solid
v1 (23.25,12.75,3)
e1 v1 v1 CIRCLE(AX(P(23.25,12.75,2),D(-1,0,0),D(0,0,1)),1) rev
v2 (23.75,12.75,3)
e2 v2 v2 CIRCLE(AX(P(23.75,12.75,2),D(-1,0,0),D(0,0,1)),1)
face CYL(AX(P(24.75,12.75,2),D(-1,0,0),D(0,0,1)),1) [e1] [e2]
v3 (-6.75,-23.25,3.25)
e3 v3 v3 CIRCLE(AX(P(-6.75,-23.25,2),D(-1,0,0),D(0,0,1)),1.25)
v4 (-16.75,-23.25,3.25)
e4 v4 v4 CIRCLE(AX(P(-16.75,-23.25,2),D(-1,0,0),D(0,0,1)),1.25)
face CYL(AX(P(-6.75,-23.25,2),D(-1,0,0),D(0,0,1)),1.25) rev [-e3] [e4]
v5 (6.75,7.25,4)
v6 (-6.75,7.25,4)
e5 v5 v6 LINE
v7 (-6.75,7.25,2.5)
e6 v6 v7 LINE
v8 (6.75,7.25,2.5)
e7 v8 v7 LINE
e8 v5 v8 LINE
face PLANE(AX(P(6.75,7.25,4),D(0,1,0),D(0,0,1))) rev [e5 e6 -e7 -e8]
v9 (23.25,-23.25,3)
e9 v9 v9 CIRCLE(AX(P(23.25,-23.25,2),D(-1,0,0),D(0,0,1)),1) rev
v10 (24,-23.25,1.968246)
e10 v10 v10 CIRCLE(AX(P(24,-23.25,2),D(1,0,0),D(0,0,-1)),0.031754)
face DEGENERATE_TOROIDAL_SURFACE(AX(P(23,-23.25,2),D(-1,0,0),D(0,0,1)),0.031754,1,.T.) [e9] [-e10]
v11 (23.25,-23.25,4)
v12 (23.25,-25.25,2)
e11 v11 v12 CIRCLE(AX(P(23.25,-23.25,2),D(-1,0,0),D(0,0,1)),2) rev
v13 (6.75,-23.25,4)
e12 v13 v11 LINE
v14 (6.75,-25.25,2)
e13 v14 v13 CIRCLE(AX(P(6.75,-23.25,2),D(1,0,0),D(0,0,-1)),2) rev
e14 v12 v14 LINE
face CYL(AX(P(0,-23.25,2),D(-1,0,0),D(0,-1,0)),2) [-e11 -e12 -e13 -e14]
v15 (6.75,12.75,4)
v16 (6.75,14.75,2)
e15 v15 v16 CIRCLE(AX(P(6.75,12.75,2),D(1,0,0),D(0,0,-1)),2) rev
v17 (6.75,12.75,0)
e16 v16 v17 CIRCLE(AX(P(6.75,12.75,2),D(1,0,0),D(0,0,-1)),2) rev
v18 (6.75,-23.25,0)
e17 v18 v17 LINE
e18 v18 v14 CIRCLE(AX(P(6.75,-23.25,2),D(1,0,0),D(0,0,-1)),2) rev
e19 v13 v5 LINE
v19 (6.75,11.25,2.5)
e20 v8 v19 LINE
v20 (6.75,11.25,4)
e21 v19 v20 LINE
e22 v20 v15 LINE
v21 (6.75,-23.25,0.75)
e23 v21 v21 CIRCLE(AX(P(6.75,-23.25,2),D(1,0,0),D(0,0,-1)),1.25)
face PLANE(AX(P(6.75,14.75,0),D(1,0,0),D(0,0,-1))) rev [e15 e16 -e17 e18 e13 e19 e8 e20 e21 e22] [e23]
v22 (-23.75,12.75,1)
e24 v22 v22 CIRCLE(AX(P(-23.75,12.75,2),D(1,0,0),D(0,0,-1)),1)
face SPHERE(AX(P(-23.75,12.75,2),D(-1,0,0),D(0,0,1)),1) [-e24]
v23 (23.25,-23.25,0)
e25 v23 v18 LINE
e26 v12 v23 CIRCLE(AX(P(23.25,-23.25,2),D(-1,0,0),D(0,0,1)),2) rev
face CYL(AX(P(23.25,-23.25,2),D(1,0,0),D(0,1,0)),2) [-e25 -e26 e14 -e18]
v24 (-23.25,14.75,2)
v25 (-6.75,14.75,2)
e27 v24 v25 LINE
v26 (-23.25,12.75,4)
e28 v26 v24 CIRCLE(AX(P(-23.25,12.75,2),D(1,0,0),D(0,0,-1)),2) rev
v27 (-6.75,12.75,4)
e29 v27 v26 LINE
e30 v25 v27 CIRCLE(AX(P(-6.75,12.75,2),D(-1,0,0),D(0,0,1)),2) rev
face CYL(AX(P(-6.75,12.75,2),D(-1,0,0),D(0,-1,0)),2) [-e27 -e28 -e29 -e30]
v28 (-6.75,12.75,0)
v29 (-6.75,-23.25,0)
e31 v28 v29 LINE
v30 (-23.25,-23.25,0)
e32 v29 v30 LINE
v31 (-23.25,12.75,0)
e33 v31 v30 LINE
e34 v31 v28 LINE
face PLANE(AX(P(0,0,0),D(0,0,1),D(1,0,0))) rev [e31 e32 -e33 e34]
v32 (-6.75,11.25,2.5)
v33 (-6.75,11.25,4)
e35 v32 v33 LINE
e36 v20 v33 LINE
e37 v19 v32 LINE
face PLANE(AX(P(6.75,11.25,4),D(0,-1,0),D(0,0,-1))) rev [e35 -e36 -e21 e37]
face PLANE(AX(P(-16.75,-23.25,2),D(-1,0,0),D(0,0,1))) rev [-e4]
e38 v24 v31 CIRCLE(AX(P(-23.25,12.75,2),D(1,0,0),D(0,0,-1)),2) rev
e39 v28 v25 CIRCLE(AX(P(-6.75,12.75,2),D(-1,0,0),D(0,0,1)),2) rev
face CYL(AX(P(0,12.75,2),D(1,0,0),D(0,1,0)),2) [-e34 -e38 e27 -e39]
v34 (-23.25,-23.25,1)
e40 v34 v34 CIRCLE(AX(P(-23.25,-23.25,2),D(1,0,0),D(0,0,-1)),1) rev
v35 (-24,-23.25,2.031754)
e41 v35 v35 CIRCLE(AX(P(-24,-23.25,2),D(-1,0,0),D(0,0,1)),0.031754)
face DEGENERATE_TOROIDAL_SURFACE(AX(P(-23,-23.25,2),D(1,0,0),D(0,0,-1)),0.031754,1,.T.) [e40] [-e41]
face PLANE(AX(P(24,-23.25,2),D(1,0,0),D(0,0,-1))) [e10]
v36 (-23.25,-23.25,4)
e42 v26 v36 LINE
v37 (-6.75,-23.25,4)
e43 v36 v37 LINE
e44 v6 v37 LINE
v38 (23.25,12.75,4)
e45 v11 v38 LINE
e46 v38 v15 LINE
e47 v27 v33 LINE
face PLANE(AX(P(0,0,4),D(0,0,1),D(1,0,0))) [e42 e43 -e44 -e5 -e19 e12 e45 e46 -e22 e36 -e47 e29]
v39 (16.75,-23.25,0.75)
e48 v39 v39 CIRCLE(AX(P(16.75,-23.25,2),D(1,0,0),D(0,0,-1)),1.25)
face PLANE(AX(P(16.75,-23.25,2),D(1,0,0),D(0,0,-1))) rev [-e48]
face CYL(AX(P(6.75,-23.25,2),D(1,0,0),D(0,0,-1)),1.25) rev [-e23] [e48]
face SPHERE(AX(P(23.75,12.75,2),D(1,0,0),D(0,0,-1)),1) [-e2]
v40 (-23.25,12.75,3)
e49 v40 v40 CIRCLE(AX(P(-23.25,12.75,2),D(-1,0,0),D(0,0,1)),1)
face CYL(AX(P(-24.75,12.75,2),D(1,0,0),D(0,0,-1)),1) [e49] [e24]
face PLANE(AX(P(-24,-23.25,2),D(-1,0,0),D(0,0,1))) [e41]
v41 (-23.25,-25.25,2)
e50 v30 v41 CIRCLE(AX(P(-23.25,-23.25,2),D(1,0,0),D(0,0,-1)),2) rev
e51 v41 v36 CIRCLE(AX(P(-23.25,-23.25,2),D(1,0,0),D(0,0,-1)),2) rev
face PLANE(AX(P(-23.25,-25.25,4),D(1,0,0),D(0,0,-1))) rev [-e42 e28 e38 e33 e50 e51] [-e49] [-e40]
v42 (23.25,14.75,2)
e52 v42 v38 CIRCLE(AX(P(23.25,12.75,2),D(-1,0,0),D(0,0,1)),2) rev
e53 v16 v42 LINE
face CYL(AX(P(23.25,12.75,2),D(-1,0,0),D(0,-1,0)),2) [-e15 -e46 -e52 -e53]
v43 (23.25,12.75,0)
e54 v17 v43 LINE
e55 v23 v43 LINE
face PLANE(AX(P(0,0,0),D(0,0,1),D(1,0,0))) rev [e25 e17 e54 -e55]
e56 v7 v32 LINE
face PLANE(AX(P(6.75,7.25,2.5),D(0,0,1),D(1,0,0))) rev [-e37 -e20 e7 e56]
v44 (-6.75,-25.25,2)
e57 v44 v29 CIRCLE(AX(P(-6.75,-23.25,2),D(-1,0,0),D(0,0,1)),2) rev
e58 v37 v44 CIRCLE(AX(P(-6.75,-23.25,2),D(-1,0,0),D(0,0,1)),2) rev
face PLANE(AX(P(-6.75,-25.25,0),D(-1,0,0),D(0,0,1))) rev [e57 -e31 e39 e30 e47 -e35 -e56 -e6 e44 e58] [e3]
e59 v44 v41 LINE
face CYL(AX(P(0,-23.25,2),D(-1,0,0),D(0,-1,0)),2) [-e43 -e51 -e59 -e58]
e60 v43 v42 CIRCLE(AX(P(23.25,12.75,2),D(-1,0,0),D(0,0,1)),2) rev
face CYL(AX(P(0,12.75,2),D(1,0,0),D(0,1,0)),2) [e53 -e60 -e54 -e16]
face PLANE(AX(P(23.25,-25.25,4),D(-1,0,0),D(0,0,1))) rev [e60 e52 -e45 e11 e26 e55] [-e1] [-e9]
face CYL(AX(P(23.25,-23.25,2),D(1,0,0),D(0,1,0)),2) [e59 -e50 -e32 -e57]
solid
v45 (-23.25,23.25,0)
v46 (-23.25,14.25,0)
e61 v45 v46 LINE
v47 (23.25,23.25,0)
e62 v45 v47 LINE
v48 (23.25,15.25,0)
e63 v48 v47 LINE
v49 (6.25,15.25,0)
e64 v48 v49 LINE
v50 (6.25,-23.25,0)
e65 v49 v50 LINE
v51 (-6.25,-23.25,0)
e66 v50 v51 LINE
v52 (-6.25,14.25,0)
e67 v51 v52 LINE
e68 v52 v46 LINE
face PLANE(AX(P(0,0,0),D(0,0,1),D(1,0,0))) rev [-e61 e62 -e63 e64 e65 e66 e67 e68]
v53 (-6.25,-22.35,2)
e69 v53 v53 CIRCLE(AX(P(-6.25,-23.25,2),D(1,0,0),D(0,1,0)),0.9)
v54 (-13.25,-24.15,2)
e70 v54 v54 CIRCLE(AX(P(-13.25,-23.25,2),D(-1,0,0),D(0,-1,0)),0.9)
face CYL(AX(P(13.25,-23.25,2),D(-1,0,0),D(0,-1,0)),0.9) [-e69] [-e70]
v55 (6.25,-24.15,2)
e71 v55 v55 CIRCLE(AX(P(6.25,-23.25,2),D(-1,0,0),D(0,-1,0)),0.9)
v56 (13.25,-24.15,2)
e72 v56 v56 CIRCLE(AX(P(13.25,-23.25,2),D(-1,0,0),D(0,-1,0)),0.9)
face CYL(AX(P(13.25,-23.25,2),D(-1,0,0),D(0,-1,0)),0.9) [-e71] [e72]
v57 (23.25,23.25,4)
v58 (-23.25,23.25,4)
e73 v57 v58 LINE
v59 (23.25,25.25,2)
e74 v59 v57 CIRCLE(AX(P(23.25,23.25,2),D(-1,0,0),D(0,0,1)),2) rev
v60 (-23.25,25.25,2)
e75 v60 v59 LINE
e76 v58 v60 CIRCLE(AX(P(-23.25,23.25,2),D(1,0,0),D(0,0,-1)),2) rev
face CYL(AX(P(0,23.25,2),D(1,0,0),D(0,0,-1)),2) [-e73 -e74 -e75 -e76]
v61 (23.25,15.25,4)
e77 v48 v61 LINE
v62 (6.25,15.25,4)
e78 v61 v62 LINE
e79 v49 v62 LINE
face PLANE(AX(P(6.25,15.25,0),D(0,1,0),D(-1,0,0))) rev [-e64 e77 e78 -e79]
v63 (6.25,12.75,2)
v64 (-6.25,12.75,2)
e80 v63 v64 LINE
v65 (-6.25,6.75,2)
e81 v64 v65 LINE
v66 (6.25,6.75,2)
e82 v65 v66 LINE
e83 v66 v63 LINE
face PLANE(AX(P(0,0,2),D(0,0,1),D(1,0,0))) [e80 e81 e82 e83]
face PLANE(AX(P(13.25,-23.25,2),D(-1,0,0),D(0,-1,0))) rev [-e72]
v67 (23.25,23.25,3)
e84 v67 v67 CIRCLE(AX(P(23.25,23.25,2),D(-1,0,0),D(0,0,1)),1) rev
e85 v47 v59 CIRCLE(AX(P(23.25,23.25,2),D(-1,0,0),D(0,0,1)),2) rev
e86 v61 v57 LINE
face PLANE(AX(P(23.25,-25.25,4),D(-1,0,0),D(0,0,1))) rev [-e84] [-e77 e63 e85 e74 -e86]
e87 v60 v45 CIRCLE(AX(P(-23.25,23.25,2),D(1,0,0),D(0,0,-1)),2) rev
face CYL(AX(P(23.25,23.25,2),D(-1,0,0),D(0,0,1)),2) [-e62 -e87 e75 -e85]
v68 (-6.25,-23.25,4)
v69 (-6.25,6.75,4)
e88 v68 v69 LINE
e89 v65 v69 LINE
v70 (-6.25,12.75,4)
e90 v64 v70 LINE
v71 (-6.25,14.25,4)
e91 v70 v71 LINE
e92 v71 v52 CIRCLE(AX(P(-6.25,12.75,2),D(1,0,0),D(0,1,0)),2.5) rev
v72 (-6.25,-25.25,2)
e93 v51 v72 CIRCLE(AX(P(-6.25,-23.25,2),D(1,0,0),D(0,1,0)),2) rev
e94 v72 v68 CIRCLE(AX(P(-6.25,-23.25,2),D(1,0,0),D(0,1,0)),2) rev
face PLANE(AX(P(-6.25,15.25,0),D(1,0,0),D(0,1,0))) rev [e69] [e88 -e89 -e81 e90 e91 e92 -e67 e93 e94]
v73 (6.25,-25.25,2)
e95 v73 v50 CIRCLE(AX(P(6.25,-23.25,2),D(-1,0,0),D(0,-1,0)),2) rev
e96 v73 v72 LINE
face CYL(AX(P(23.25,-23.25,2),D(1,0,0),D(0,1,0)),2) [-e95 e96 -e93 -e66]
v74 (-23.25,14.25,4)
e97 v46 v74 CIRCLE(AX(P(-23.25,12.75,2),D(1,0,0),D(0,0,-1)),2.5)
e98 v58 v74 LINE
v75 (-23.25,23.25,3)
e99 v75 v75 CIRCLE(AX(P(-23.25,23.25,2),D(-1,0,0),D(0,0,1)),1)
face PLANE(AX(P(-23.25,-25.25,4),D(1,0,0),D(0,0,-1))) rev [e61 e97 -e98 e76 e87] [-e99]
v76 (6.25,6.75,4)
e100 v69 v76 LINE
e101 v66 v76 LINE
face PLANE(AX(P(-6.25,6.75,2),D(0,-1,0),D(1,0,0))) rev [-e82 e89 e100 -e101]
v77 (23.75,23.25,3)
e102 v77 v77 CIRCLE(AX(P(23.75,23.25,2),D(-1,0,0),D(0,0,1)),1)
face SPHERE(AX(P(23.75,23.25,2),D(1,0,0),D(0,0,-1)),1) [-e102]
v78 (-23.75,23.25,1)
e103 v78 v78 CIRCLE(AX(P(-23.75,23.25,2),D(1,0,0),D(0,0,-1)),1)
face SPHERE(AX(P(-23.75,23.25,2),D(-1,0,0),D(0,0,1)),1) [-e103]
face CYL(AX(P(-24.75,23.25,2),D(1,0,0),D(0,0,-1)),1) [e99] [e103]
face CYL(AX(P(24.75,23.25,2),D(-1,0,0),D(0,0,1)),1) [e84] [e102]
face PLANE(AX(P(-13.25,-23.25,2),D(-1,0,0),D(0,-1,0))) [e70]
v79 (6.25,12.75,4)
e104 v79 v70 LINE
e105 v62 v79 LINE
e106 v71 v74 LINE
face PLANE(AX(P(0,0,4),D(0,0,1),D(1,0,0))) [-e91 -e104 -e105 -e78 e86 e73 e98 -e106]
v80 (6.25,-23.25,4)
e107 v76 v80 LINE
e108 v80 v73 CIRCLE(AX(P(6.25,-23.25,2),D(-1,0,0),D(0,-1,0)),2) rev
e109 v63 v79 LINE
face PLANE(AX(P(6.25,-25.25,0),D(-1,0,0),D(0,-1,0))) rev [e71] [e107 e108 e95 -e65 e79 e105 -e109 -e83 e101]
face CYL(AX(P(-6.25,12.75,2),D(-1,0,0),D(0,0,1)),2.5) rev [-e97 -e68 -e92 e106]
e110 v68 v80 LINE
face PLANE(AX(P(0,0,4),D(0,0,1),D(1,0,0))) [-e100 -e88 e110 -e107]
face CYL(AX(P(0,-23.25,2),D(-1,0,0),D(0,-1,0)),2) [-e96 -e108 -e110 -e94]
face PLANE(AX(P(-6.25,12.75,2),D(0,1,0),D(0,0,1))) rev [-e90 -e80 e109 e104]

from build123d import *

# Parameters (mm, degrees)
SKETCH1_W             = 46.5
SKETCH1_H             = 50.5
BODY_DEPTH            = 4
BODY_CUT_DEPTH        = 4
FILLET1_R             = 2
FILLET2_R             = 2
FILLET3_R             = 2
HINGE_HOLE_L_START    = -6.5
SKETCH4_R             = 1.25
HINGE_HOLE_L_DEPTH    = 10
HINGE_HOLE_R_START    = -6.5
SKETCH8_R             = 1.25
HINGE_HOLE_R_DEPTH    = 10
HINGE_ROD_START       = 7
SKETCH7_R             = 0.9
HINGE_ROD_DEPTH       = 26.5
SKETCH9_W             = 12.5
SKETCH9_H             = 6
CONN_CUT_DEPTH        = 2
SKETCH10_W            = 1.5
SKETCH10_H            = 4
CONN_PIECE_DEPTH      = 13.5
SKETCH12_R            = 1
BUMPS_L_DEPTH         = 1.5
SKETCH13_R            = 1
BUMPS_R_DEPTH         = 1.5
SKETCH14_R            = 1
MINI_BUMP_L_DEPTH     = 0.75
SKETCH15_R            = 1
MINI_BUMP_R_DEPTH     = 0.75
FILLET6_R             = 1
FILLET7_R             = 1
FILLET8_R             = 1
HOOK_MATERIAL_R_DEPTH = 17


# Some blends are built 0.0001 mm under size
with BuildPart() as part:
    # Sketch1 → body (new body)
    with BuildSketch(Plane.XY):
        Rectangle(SKETCH1_W, SKETCH1_H)
    extrude(amount=BODY_DEPTH)

    # Sketch2 → body_cut (cut)
    with BuildSketch(Plane.XY.offset(4)):
        Polygon((-23.25, 15.25), (-6.25, 15.25), (-6.25, -25.25), (-6.75, -25.25), (-6.75, 14.75), (-23.25, 14.75), align=None)
        Polygon((6.25, 15.25), (23.25, 15.25), (23.25, 14.75), (6.75, 14.75), (6.75, -25.25), (6.25, -25.25), align=None)
    extrude(amount=-BODY_CUT_DEPTH, mode=Mode.SUBTRACT)


with BuildPart() as body_cut_piece_1:
    # of the separate pieces the step leaves, piece 1, a body of its own (body_cut_pieces)
    add(part.part.solids().sort_by_distance((6.25, -25.25, 0))[0])

    # Fillet3
    fillet3_edges = [body_cut_piece_1.edges().sort_by_distance(p)[0] for p in [
        (0, 25.25, 0),
        (0, 25.25, 4),
        (0, -25.25, 0),
        (0, -25.25, 4),
    ]]
    fillet(fillet3_edges, radius=FILLET3_R - 0.0001)  # a hair under: the kernel refuses the full size

    # Sketch7 → hinge_rod (add)
    with BuildSketch(Plane.ZY.offset(6.25).offset(HINGE_ROD_START)):
        with Locations(Location((2, -23.25, 0), (0, 0, 270))):
            Circle(SKETCH7_R)
    extrude(amount=-HINGE_ROD_DEPTH)

    # Sketch9 → conn_cut (cut)
    with BuildSketch(Plane.XY.offset(4)):
        with Locations((0, 9.75)):
            Rectangle(SKETCH9_W, SKETCH9_H)
    extrude(amount=-CONN_CUT_DEPTH, mode=Mode.SUBTRACT)



with BuildPart() as body_cut_piece_2:
    # of the separate pieces the step leaves, piece 2, a body of its own (body_cut_pieces)
    add(part.part.solids().sort_by_distance((-6.75, -25.25, 0))[0])

    # Fillet1
    fillet1_edges = [body_cut_piece_2.edges().sort_by_distance(p)[0] for p in [
        (-15, -25.25, 0),
        (-15, -25.25, 4),
        (-15, 14.75, 4),
        (-15, 14.75, 0),
    ]]
    fillet(fillet1_edges, radius=FILLET1_R - 0.0001)  # a hair under: the kernel refuses the full size

    # Sketch8 → hinge_hole_r (cut)
    with BuildSketch(Plane.ZY.offset(23.25).offset(HINGE_HOLE_R_START)):
        with Locations(Location((2, -23.25, 0), (0, 0, 180))):
            Circle(SKETCH8_R)
    extrude(amount=-HINGE_HOLE_R_DEPTH, mode=Mode.SUBTRACT)



with BuildPart() as body_cut_piece_3:
    # of the separate pieces the step leaves, piece 3, a body of its own (body_cut_pieces)
    add(part.part.solids().sort_by_distance((23.25, -25.25, 0))[0])

    # Fillet2
    fillet2_edges = [body_cut_piece_3.edges().sort_by_distance(p)[0] for p in [
        (15, 14.75, 0),
        (15, -25.25, 0),
        (15, -25.25, 4),
        (15, 14.75, 4),
    ]]
    fillet(fillet2_edges, radius=FILLET2_R - 0.0001)  # a hair under: the kernel refuses the full size

    # Sketch4 → hinge_hole_l (cut)
    with BuildSketch(Plane(origin=(23.25, 0, 0), x_dir=(0, 0, -1), z_dir=(1, 0, 0)).offset(HINGE_HOLE_L_START)):
        with Locations((-2, -23.25)):
            Circle(SKETCH4_R)
    extrude(amount=-HINGE_HOLE_L_DEPTH, mode=Mode.SUBTRACT)


with BuildPart() as body_cut_piece_2_1:
    add(body_cut_piece_2.part)

    add(body_cut_piece_3.part)  # conn_piece merges body_cut piece 3
    # Sketch10 → conn_piece (add)
    with BuildSketch(Plane(origin=(-6.75, 0, 0), x_dir=(0, 0, -1), z_dir=(1, 0, 0))):
        with Locations((-3.25, 9.25)):
            Rectangle(SKETCH10_W, SKETCH10_H)
    extrude(amount=CONN_PIECE_DEPTH)


with BuildPart() as body_cut_piece_1_1:
    add(body_cut_piece_1.part)

    add(body_cut_piece_2_1.part)  # bumps_l merges body_cut piece 2
    # Sketch12 → bumps_l (add)
    with BuildSketch(Plane(origin=(23.25, 0, 0), x_dir=(0, 0, -1), z_dir=(1, 0, 0))):
        with Locations(Location((-2, 23.25, 0), (0, 0, 180))):
            Circle(SKETCH12_R)
        with Locations(Location((-2, 12.75, 0), (0, 0, 180))):
            Circle(SKETCH12_R)
    extrude(amount=BUMPS_L_DEPTH)

    # Sketch13 → bumps_r (add)
    with BuildSketch(Plane.ZY.offset(23.25)):
        with Locations((2, 23.25)):
            Circle(SKETCH13_R)
        with Locations((2, 12.75)):
            Circle(SKETCH13_R)
    extrude(amount=BUMPS_R_DEPTH)

    # Sketch14 → mini_bump_l (add)
    with BuildSketch(Plane(origin=(23.25, 0, 0), x_dir=(0, 0, -1), z_dir=(1, 0, 0))):
        with Locations(Location((-2, -23.25, 0), (0, 0, 180))):
            Circle(SKETCH14_R)
    extrude(amount=MINI_BUMP_L_DEPTH)

    # Sketch15 → mini_bump_r (add)
    with BuildSketch(Plane.ZY.offset(23.25)):
        with Locations((2, -23.25)):
            Circle(SKETCH15_R)
    extrude(amount=MINI_BUMP_R_DEPTH)

    # Fillet6
    fillet6_edges = [body_cut_piece_1_1.edges().sort_by_distance(p)[0] for p in [
        (24.75, 23.25, 1),
        (-24.75, 23.25, 1),
    ]]
    fillet(fillet6_edges, radius=FILLET6_R)

    # Fillet7
    # the kernel refuses this fillet: 1 mm, written as the material it takes off along each edge
    with BuildSketch(Plane(origin=(-24.75, 12.75, 2), x_dir=(0, 0, 1), z_dir=(0, -1, 0))) as fillet7_piece_1:
        with BuildLine():
            CenterArc((1 - FILLET7_R, -FILLET7_R), FILLET7_R, 0, 90)
            Line((1 - FILLET7_R, 0), (1 - FILLET7_R, FILLET7_R * 0.02))
            Line((1 - FILLET7_R, FILLET7_R * 0.02), (1, FILLET7_R * 0.02))
            Line((1, FILLET7_R * 0.02), (1 + FILLET7_R * 0.02, 0))
            Line((1 + FILLET7_R * 0.02, 0), (1 + FILLET7_R * 0.02, -FILLET7_R))
            Line((1 + FILLET7_R * 0.02, -FILLET7_R), (1, -FILLET7_R))
        make_face()
    revolve(axis=Axis((-24.75, 12.75, 2), (-1, 0, 0)), mode=Mode.SUBTRACT)
    with BuildSketch(Plane(origin=(-24, -23.25, 2), x_dir=(0, 0, 1), z_dir=(0, -1, 0))) as fillet7_piece_2:
        with BuildLine():
            CenterArc((0.031754163, -1), FILLET7_R, 14.477512186, 75.522487814)
            Line((0.031754163, 0), (0.031754163, 0.02))
            Line((0.031754163, 0.02), (1, 0.02))
            Line((1, 0.02), (1.02, 0))
            ThreePointArc((1.02, 0), (1.02, -0.375), (1.019364917, -0.745))
            Line((1.019364917, -0.745), (1, -0.75))
        make_face()
    revolve(axis=Axis((-24, -23.25, 2), (-1, 0, 0)), mode=Mode.SUBTRACT)

    # Fillet8
    # the kernel refuses this fillet: 1 mm, written as the material it takes off along each edge
    with BuildSketch(Plane(origin=(24.75, 12.75, 2), x_dir=(0, 0, 1), z_dir=(0, 1, 0))) as fillet8_piece_1:
        with BuildLine():
            CenterArc((1 - FILLET8_R, -FILLET8_R), FILLET8_R, 0, 90)
            Line((1 - FILLET8_R, 0), (1 - FILLET8_R, FILLET8_R * 0.02))
            Line((1 - FILLET8_R, FILLET8_R * 0.02), (1, FILLET8_R * 0.02))
            Line((1, FILLET8_R * 0.02), (1 + FILLET8_R * 0.02, 0))
            Line((1 + FILLET8_R * 0.02, 0), (1 + FILLET8_R * 0.02, -FILLET8_R))
            Line((1 + FILLET8_R * 0.02, -FILLET8_R), (1, -FILLET8_R))
        make_face()
    revolve(axis=Axis((24.75, 12.75, 2), (1, 0, 0)), mode=Mode.SUBTRACT)
    with BuildSketch(Plane(origin=(24, -23.25, 2), x_dir=(0, 0, 1), z_dir=(0, 1, 0))) as fillet8_piece_2:
        with BuildLine():
            CenterArc((0.031754163, -1), FILLET8_R, 14.477512186, 75.522487814)
            Line((0.031754163, 0), (0.031754163, 0.02))
            Line((0.031754163, 0.02), (1, 0.02))
            Line((1, 0.02), (1.02, 0))
            ThreePointArc((1.02, 0), (1.02, -0.375), (1.019364917, -0.745))
            Line((1.019364917, -0.745), (1, -0.75))
        make_face()
    revolve(axis=Axis((24, -23.25, 2), (1, 0, 0)), mode=Mode.SUBTRACT)

    # Sketch16 → hook_material_r (add)
    with BuildSketch(Plane.ZY.offset(23.25)):
        with BuildLine():
            Line((0, 14.25), (0, 15.75))
            Line((0, 15.75), (4, 15.75))
            Line((4, 15.75), (4, 14.25))
            ThreePointArc((4, 14.25), (2, 15.25), (0, 14.25))
        make_face()
    extrude(amount=-HOOK_MATERIAL_R_DEPTH)


solid = body_cut_piece_1_1.part
